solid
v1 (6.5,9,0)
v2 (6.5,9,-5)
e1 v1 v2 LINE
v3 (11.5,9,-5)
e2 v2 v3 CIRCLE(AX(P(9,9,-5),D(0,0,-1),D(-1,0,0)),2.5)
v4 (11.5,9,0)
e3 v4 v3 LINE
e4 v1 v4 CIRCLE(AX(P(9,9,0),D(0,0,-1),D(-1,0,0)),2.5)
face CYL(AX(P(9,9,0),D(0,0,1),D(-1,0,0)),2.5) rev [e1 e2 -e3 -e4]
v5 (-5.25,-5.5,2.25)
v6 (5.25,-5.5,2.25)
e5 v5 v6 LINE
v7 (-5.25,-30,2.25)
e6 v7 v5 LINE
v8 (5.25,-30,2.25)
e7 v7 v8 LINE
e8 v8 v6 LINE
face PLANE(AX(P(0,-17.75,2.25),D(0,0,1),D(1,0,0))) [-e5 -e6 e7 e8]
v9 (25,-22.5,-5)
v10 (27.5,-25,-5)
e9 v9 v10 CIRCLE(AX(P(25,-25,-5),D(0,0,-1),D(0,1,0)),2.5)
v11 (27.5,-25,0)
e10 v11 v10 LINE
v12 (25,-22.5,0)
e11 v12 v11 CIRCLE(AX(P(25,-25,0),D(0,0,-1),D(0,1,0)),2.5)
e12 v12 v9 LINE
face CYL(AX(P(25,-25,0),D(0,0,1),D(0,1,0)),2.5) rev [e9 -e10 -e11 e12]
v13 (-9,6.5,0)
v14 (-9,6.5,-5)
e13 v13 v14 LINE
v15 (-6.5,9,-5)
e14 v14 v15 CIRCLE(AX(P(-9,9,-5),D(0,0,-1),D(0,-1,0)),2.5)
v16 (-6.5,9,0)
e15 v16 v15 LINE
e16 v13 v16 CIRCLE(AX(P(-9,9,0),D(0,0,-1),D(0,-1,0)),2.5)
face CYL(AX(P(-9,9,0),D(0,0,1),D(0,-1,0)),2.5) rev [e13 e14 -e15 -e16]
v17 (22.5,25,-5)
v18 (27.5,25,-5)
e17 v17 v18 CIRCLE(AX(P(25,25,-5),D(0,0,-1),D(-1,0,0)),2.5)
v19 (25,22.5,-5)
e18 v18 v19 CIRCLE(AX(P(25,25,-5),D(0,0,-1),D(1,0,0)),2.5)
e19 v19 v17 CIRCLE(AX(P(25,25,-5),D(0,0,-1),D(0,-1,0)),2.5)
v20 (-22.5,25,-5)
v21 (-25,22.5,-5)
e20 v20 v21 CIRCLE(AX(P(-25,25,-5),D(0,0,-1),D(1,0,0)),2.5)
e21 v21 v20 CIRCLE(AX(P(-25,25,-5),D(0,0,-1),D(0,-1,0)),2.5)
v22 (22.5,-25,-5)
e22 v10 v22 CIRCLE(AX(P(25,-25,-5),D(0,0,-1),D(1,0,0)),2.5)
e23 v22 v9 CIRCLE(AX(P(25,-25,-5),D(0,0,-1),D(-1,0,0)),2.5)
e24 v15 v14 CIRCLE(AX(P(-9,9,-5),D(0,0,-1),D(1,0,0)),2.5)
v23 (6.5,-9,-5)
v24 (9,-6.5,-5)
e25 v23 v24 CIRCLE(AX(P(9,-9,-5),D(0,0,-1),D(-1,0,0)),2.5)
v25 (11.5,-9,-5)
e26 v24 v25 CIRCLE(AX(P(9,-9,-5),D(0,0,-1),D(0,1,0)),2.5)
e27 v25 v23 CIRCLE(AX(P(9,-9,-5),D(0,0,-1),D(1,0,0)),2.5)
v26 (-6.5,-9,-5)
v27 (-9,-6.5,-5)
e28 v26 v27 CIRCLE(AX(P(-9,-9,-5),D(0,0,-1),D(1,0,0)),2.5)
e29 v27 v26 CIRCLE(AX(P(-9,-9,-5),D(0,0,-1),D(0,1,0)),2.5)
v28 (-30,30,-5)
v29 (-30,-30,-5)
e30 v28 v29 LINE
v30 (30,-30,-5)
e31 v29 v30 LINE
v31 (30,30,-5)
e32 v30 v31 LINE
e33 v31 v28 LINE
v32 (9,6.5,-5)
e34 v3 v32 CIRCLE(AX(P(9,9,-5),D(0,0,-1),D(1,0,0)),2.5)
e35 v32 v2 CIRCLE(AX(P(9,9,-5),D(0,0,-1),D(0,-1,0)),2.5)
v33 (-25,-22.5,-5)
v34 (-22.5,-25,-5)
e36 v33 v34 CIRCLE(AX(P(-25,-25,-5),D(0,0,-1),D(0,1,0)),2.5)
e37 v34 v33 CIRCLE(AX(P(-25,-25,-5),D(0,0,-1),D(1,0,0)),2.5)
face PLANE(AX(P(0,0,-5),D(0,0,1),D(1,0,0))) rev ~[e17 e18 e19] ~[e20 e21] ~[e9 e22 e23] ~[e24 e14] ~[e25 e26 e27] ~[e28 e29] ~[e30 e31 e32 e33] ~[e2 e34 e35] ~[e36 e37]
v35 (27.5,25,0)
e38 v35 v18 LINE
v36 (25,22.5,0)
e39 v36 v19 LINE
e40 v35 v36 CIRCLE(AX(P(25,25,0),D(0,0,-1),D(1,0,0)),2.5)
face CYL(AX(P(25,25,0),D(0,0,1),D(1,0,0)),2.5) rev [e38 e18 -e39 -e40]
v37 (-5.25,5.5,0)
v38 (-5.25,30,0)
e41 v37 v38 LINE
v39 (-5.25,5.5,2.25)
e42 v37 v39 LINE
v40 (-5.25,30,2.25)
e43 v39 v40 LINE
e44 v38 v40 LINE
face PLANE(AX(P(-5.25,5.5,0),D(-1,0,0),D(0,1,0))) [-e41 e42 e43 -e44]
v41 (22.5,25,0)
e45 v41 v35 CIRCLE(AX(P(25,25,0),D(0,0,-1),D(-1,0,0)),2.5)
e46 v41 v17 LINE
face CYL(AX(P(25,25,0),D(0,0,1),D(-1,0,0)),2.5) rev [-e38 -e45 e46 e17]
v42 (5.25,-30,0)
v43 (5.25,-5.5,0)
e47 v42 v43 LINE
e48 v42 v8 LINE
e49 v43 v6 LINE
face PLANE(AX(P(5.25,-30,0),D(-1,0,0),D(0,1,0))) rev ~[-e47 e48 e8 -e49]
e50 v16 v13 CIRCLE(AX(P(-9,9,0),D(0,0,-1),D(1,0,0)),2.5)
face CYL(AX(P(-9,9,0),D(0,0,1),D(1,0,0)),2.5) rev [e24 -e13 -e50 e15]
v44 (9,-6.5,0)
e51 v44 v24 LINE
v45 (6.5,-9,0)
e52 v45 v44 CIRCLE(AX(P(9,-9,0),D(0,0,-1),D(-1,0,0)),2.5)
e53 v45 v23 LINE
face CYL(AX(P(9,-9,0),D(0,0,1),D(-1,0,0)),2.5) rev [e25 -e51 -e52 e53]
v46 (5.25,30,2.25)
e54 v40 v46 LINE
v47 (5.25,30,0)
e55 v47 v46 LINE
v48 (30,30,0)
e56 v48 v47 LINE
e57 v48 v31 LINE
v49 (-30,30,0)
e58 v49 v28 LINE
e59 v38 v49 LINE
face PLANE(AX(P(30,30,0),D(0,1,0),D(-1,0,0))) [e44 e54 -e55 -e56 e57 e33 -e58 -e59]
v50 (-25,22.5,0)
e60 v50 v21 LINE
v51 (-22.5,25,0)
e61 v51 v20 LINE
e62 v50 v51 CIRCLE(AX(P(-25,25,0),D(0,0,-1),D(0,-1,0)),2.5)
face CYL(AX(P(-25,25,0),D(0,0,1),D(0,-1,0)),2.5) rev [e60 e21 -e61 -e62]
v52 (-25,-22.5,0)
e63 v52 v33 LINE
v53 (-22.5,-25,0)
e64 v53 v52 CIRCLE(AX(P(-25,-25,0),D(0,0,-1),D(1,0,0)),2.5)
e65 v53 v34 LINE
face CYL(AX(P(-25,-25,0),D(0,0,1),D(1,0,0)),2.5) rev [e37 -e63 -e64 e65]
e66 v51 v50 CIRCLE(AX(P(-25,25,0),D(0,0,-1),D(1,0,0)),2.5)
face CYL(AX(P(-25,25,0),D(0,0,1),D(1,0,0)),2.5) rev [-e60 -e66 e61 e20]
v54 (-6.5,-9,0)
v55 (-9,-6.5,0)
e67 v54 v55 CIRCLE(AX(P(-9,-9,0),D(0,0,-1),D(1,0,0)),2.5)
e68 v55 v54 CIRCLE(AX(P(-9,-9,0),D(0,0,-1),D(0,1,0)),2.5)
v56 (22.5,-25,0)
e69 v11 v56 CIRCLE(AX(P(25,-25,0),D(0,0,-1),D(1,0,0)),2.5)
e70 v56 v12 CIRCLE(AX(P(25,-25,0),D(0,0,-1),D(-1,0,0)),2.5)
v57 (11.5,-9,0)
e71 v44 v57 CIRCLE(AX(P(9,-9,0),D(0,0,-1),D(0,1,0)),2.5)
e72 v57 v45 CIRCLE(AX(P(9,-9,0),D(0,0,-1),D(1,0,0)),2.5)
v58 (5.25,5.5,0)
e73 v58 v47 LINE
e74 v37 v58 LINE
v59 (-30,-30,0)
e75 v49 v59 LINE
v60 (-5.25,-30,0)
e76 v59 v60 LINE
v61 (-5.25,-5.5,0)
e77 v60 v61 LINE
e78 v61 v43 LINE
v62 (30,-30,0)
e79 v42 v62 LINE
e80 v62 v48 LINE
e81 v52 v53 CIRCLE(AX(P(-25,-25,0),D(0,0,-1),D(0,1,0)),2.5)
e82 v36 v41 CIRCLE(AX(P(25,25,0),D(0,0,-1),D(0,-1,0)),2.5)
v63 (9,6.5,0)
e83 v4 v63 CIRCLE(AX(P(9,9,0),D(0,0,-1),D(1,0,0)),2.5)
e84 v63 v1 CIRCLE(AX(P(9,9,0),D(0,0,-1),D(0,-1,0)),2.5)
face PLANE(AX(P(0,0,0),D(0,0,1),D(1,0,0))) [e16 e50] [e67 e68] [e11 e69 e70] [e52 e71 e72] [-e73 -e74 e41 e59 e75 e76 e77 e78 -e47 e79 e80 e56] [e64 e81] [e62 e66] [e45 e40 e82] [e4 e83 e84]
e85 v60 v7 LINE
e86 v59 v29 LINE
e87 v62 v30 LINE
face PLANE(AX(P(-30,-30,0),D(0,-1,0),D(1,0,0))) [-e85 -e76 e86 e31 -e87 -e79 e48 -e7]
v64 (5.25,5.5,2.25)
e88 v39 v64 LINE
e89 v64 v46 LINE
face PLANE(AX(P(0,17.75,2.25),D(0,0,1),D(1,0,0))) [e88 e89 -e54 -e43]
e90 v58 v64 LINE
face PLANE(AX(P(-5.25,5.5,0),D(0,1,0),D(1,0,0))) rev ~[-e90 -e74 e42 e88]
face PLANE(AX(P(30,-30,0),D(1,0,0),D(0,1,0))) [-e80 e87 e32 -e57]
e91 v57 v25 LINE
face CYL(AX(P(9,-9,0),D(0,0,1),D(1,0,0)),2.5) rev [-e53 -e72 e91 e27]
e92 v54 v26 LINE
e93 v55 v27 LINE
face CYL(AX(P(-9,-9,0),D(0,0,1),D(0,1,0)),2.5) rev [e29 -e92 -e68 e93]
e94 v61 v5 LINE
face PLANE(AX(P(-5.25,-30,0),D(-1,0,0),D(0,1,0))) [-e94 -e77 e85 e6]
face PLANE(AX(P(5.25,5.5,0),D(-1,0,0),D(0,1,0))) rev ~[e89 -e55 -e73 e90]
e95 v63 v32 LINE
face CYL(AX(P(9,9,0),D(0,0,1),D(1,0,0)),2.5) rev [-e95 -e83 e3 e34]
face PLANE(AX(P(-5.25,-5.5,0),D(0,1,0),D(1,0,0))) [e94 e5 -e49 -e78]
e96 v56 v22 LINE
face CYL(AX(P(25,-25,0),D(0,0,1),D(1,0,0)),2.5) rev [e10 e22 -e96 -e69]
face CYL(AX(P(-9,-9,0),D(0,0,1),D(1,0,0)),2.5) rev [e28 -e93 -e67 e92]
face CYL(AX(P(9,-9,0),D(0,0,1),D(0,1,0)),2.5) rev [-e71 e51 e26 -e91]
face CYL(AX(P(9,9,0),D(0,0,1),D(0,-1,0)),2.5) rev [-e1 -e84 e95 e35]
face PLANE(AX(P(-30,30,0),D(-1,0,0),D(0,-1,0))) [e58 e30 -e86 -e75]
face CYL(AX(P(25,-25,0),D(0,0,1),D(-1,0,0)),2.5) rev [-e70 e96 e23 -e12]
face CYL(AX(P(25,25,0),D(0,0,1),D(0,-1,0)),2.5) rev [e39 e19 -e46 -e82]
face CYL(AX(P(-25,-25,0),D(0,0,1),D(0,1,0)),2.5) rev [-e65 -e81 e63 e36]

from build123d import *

# Parameters (mm, degrees)
F1_DEPTH = 5
F2_W     = 10.5
F2_H     = 24.5
F3_DEPTH = 2.25


# Not quite as in the source:
# - a feature names something its author has since deleted; it is built from what else it names


with BuildPart() as f1:
    # F0 (on Top) → F1 (new body)
    with BuildSketch(Plane.XY):
        Polygon((5.25, -30), (30, -30), (30, 30), (-30, 30), (-30, -30), (0, -30), align=None)
        with BuildLine():
            Line((22.5, -25), (-22.5, -25))
            ThreePointArc((-22.5, -25), (-26.767766953, -26.767766953), (-25, -22.5))
            Line((-25, -22.5), (-25, 22.5))
            ThreePointArc((-25, 22.5), (-26.767766953, 26.767766953), (-22.5, 25))
            Line((-22.5, 25), (22.5, 25))
            ThreePointArc((22.5, 25), (25, 27.5), (27.5, 25))
            ThreePointArc((27.5, 25), (26.767766953, 23.232233047), (25, 22.5))
            Line((25, 22.5), (25, -22.5))
            ThreePointArc((25, -22.5), (26.767766953, -23.232233047), (27.5, -25))
            ThreePointArc((27.5, -25), (25, -27.5), (22.5, -25))
        make_face(mode=Mode.SUBTRACT)
        with BuildLine():
            ThreePointArc((-25, -22.5), (-23.232233047, -23.232233047), (-22.5, -25))
            Line((-22.5, -25), (22.5, -25))
            ThreePointArc((22.5, -25), (23.232233047, -23.232233047), (25, -22.5))
            Line((25, -22.5), (25, 22.5))
            ThreePointArc((25, 22.5), (23.232233047, 23.232233047), (22.5, 25))
            Line((22.5, 25), (-22.5, 25))
            ThreePointArc((-22.5, 25), (-23.232233047, 23.232233047), (-25, 22.5))
            Line((-25, 22.5), (-25, -22.5))
        make_face()
        with BuildLine():
            Line((6.5, -9), (-6.5, -9))
            ThreePointArc((-6.5, -9), (-10.767766953, -10.767766953), (-9, -6.5))
            Line((-9, -6.5), (-9, 6.5))
            ThreePointArc((-9, 6.5), (-10.767766953, 10.767766953), (-6.5, 9))
            Line((-6.5, 9), (6.5, 9))
            ThreePointArc((6.5, 9), (9, 11.5), (11.5, 9))
            ThreePointArc((11.5, 9), (10.767766953, 7.232233047), (9, 6.5))
            Line((9, 6.5), (9, -6.5))
            ThreePointArc((9, -6.5), (10.767766953, -7.232233047), (11.5, -9))
            ThreePointArc((11.5, -9), (9, -11.5), (6.5, -9))
        make_face(mode=Mode.SUBTRACT)
        with BuildLine():
            ThreePointArc((-9, -6.5), (-7.232233047, -7.232233047), (-6.5, -9))
            Line((-6.5, -9), (6.5, -9))
            ThreePointArc((6.5, -9), (7.232233047, -7.232233047), (9, -6.5))
            Line((9, -6.5), (9, 6.5))
            ThreePointArc((9, 6.5), (7.232233047, 7.232233047), (6.5, 9))
            Line((6.5, 9), (-6.5, 9))
            ThreePointArc((-6.5, 9), (-7.232233047, 7.232233047), (-9, 6.5))
            Line((-9, 6.5), (-9, -6.5))
        make_face()
    extrude(amount=-F1_DEPTH)

    # F2 (on face) → F3 (join)
    with BuildSketch(Plane.XY):
        with Locations((0, 17.75)):
            Rectangle(F2_W, F2_H)
        with Locations((0, -17.75)):
            Rectangle(F2_W, F2_H)
    extrude(amount=F3_DEPTH)


solid = f1.part
